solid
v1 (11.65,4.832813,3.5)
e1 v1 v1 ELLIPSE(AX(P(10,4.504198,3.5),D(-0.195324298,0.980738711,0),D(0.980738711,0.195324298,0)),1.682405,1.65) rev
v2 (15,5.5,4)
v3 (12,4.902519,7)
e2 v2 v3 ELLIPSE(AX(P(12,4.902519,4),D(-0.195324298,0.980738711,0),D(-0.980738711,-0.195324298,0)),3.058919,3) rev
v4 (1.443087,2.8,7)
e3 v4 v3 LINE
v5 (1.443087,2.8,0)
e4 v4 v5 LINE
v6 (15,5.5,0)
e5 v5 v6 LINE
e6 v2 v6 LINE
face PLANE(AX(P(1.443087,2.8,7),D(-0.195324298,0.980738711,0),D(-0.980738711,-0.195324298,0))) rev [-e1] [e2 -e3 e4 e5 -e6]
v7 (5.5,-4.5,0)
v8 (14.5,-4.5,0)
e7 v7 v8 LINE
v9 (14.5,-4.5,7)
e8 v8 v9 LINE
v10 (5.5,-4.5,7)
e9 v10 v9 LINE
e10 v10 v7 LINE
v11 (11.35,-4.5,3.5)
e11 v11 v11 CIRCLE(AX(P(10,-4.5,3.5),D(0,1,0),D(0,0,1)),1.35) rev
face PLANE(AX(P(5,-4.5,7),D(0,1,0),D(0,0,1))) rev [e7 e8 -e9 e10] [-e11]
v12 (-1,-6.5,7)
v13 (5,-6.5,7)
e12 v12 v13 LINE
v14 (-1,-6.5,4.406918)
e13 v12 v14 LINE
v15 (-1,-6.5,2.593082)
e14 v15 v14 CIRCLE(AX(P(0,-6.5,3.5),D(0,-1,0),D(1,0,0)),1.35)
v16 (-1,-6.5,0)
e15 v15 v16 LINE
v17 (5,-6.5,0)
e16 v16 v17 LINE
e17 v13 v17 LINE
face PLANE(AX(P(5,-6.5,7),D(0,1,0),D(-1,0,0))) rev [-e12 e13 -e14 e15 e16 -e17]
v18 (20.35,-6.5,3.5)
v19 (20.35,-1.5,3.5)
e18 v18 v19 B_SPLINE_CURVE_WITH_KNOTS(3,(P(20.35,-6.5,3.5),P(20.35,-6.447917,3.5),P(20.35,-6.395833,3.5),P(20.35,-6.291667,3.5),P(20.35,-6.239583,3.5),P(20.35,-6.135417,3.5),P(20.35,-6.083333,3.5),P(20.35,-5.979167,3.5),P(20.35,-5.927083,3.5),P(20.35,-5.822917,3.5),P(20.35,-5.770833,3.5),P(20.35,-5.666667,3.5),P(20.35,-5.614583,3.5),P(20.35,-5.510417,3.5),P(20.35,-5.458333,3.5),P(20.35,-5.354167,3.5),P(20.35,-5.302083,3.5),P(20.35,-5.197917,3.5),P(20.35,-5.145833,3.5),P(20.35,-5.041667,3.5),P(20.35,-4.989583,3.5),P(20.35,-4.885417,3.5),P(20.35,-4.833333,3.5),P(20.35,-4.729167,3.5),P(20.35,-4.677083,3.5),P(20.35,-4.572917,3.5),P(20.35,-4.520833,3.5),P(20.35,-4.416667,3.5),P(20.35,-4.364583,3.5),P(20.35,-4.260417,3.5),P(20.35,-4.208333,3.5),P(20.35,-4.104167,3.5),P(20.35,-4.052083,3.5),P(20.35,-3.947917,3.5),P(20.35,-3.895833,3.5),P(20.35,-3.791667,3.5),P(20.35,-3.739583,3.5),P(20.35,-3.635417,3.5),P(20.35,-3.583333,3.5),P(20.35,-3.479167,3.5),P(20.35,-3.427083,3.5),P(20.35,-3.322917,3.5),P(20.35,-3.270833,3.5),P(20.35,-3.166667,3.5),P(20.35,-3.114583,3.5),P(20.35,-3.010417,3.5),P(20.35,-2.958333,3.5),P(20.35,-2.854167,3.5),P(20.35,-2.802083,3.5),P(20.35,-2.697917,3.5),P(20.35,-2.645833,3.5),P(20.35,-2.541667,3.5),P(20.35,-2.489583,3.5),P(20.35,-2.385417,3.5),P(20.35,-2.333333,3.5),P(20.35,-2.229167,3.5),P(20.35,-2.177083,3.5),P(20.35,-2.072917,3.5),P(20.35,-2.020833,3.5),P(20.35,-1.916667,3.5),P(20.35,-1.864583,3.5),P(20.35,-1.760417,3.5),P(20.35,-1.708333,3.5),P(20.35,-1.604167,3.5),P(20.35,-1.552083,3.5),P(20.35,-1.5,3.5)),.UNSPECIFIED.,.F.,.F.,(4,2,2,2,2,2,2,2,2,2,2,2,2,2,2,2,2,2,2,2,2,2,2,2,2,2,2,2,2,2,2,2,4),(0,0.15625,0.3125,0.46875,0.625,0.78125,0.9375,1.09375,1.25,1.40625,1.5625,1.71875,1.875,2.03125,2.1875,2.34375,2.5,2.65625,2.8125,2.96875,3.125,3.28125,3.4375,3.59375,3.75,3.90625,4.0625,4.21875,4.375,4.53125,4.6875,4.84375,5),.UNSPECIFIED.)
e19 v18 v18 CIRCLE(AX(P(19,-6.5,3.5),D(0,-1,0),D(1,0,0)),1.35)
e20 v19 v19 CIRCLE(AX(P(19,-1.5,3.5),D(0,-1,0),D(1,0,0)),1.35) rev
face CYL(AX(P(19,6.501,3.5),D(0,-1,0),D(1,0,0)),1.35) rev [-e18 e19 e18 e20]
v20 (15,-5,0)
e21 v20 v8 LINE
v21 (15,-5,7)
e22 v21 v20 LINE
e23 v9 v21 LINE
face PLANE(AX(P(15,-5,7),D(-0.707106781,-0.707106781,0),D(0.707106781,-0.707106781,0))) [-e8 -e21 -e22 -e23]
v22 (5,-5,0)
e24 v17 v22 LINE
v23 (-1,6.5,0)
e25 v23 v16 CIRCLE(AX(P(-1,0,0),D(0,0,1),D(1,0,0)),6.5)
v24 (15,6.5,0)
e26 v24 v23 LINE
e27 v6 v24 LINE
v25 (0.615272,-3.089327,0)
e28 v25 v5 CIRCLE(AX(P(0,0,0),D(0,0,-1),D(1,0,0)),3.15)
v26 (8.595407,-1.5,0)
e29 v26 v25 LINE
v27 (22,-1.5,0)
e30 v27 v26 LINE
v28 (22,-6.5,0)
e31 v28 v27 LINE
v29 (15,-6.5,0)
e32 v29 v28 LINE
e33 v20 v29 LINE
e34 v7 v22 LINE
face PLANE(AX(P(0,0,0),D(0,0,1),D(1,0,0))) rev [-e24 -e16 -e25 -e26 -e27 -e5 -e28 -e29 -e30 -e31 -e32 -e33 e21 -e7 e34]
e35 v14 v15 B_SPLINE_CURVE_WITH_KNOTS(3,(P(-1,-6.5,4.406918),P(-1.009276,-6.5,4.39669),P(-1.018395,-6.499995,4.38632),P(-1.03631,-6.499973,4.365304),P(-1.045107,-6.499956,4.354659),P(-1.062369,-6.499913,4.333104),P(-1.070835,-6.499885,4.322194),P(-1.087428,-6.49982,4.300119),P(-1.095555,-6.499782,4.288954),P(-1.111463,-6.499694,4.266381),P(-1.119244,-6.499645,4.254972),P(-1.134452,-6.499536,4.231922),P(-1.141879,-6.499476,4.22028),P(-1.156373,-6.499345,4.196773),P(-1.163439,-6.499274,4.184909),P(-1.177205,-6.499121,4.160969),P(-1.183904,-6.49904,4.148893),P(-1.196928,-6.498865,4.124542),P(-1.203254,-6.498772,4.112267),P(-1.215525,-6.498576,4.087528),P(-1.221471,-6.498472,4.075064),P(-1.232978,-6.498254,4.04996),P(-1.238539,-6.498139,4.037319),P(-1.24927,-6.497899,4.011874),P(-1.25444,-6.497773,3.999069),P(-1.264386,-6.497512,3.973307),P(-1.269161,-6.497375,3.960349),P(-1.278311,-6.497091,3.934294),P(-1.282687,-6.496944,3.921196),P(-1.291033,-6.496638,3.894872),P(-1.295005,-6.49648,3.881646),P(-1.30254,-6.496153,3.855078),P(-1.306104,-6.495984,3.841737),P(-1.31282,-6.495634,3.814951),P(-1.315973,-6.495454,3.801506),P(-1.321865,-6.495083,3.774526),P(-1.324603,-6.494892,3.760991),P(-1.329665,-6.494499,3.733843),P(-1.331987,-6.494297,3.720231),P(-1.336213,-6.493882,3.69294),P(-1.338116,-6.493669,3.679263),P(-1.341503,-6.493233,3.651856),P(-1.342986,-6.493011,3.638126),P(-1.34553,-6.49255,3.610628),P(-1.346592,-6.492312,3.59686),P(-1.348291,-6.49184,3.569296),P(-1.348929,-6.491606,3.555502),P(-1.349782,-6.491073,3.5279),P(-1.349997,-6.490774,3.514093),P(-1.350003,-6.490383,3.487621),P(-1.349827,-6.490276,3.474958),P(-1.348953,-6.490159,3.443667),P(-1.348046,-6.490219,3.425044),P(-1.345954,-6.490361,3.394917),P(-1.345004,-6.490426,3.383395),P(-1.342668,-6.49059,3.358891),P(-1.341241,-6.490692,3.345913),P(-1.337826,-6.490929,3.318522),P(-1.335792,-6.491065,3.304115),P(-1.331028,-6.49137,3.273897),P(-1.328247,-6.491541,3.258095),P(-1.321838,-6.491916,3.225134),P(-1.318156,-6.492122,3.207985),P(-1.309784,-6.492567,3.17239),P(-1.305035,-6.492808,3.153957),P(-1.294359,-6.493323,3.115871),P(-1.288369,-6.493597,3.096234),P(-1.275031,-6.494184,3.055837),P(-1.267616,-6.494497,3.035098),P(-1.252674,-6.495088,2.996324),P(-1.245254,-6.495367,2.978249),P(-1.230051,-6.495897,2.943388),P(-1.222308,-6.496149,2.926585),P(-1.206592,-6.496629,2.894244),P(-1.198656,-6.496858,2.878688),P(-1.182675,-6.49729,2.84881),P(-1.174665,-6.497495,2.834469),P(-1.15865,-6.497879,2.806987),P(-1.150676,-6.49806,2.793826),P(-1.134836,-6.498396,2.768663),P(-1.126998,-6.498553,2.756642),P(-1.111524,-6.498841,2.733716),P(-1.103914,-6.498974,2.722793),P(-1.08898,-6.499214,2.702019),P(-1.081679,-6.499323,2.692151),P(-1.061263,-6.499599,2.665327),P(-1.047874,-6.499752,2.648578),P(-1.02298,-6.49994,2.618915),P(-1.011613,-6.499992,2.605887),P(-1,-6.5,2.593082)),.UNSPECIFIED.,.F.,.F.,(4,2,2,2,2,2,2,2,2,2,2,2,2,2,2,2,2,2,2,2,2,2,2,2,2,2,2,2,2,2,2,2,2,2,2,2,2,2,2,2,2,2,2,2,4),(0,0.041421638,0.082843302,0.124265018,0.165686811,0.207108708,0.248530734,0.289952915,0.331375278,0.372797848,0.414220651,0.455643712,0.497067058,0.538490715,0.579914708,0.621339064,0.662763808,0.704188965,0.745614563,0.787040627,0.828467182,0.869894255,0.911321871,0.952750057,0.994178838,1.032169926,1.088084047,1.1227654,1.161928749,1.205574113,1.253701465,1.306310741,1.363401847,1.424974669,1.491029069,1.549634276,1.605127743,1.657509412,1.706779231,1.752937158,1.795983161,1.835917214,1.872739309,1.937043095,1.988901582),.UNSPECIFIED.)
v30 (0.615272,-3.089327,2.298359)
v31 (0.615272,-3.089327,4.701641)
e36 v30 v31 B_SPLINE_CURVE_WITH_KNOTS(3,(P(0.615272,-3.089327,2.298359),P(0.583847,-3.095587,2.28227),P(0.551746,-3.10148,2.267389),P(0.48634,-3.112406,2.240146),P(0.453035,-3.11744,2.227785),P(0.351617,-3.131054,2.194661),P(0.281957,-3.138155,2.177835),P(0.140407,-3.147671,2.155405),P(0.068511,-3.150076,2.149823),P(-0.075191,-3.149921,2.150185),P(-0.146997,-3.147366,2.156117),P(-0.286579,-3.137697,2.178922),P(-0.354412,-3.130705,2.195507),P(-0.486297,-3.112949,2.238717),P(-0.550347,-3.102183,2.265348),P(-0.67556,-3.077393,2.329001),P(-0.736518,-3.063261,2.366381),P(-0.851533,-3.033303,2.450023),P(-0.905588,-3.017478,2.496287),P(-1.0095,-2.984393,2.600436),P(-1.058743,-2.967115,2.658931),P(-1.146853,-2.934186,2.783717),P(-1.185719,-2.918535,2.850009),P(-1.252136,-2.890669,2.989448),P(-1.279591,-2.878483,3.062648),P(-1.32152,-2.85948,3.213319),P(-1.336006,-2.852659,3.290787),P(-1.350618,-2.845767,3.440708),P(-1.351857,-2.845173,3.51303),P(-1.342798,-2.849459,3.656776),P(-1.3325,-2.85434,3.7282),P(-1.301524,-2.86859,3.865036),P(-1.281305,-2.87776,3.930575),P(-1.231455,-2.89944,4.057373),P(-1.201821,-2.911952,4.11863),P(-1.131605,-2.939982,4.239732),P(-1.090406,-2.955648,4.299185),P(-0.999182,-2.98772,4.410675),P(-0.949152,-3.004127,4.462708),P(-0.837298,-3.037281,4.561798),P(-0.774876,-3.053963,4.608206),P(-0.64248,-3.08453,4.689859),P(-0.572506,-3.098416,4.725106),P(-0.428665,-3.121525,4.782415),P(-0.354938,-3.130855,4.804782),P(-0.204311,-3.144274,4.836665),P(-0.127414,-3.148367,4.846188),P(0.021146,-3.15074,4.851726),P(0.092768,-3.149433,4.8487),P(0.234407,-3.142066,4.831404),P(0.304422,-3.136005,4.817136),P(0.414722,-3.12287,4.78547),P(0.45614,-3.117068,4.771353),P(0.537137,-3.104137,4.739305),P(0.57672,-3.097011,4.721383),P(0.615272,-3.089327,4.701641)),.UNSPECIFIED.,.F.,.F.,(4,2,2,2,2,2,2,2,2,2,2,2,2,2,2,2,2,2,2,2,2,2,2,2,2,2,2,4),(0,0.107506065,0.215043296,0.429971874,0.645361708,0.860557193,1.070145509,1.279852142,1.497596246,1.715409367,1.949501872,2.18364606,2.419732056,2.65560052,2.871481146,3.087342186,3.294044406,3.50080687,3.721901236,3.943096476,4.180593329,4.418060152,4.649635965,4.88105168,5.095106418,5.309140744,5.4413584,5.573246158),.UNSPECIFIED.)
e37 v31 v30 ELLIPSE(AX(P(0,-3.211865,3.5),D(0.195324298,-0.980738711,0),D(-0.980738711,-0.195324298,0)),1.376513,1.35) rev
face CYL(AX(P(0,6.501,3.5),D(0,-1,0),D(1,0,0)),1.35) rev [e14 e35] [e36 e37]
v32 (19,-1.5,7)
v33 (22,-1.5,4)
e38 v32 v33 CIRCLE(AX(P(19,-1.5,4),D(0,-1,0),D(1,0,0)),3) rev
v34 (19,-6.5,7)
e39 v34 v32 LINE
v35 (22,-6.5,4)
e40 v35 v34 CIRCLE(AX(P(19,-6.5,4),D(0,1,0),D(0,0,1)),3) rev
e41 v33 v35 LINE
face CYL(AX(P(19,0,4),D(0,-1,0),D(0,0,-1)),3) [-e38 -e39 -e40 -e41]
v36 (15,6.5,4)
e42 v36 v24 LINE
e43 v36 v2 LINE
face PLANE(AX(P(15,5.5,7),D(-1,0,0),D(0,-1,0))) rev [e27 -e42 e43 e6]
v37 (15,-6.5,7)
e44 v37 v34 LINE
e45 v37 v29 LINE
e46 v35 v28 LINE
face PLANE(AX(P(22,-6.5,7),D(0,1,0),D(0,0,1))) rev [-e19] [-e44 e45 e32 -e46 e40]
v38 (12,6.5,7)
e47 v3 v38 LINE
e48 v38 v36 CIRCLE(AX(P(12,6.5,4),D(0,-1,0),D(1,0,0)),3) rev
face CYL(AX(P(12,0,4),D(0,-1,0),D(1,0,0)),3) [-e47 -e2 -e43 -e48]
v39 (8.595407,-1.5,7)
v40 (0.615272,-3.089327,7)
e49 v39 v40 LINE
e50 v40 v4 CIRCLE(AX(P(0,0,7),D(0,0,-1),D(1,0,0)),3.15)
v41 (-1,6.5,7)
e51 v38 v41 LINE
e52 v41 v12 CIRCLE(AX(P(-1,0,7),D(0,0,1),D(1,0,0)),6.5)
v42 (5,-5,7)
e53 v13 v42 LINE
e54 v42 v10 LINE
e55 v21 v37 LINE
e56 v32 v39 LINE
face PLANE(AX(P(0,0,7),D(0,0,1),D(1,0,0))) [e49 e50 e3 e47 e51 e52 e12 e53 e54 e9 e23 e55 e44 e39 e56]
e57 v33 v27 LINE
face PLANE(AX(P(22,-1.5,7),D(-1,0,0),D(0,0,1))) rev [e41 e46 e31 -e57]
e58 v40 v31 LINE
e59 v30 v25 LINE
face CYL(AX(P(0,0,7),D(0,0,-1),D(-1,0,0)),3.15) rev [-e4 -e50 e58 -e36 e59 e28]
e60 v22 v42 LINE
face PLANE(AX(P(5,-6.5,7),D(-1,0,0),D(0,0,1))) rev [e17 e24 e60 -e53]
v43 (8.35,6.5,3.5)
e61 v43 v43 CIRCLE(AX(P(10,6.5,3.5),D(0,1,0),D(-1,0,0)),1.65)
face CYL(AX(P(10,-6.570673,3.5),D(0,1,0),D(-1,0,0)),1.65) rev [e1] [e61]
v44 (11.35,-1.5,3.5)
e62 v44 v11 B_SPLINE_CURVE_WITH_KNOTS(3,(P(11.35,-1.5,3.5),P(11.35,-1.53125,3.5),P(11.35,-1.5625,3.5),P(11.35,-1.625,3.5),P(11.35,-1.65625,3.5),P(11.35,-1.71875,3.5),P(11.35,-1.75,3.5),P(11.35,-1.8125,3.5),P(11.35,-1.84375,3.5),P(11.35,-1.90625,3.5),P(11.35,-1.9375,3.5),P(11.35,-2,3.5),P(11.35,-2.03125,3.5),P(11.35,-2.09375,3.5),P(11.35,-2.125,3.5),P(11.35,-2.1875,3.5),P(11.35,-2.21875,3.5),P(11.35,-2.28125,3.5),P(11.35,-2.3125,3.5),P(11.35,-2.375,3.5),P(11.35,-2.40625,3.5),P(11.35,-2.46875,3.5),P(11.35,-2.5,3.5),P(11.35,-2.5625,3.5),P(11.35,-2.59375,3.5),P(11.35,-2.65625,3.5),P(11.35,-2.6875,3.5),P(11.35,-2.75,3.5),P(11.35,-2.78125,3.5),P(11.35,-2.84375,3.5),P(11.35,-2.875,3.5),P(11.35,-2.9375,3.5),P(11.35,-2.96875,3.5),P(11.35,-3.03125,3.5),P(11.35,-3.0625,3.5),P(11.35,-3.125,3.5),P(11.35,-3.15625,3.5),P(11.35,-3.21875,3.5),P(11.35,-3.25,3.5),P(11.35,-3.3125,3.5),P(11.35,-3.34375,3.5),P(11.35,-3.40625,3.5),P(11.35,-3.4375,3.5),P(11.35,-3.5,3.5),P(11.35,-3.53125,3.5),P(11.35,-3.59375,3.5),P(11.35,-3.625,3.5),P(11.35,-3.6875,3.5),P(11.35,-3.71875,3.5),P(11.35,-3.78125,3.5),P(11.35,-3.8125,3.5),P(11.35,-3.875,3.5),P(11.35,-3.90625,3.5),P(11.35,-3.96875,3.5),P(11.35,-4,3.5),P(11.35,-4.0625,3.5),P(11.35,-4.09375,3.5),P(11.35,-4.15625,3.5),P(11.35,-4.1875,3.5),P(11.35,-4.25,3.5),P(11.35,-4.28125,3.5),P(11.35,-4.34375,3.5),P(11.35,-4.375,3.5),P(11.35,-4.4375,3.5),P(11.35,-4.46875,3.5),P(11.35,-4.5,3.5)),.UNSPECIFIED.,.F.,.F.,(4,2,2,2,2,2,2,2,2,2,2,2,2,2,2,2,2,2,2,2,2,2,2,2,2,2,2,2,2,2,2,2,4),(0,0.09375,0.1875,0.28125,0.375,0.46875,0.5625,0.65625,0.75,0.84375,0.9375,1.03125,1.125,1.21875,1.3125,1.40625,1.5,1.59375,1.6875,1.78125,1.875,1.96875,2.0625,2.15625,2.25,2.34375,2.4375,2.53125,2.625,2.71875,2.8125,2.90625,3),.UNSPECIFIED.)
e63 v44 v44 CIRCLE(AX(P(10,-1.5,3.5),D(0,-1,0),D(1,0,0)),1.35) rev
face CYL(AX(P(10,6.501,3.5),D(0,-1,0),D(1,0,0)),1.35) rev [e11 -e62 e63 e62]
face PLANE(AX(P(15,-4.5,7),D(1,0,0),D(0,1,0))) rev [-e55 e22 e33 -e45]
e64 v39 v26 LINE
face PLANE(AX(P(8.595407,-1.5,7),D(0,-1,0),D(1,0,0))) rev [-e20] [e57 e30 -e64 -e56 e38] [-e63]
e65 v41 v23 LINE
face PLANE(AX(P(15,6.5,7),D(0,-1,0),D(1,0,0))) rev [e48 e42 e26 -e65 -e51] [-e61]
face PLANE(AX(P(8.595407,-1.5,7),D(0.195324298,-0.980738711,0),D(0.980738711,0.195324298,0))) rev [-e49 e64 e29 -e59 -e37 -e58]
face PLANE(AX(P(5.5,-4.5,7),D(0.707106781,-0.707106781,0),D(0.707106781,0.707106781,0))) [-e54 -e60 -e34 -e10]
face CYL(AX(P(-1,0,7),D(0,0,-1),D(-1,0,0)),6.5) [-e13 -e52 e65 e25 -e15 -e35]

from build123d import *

# Parameters (mm, degrees)
BOSS_EXTRUDE1_DEPTH = 7
CUT_EXTRUDE1_REACH  = 28.495
SKETCH2_R           = 1.35
CUT_EXTRUDE2_REACH  = 28.495
SKETCH3_R           = 1.65
FILLET1_R           = 3
CHAMFER2_SIZE       = 0.5


with BuildPart() as part:
    # Sketch1 → Boss-Extrude1 (new body)
    with BuildSketch(Plane.XY):
        with BuildLine():
            Line((1.443086969, 2.8), (15, 5.5))
            Line((15, 5.5), (15, 6.5))
            Line((15, 6.5), (-1, 6.5))
            ThreePointArc((-1, 6.5), (-7.5, 0), (-1, -6.5))
            Line((-1, -6.5), (5, -6.5))
            Line((5, -6.5), (5, -4.5))
            Line((5, -4.5), (15, -4.5))
            Line((15, -4.5), (15, -6.5))
            Line((15, -6.5), (22, -6.5))
            Line((22, -6.5), (22, -1.5))
            Line((22, -1.5), (8.595407496, -1.5))
            Line((8.595407496, -1.5), (0.615271538, -3.089326939))
            ThreePointArc((0.615271538, -3.089326939), (-3.119335327, 0.438459937), (1.443086969, 2.8))
        make_face()
    extrude(amount=BOSS_EXTRUDE1_DEPTH)

    # Sketch2 → Cut-Extrude1 (cut, up to next)
    with BuildSketch(Plane.XZ.offset(6.5), mode=Mode.PRIVATE) as cut_extrude1_sk1:
        with Locations(Location((0, 3.5, 0), (0, 0, 62.886368109))):
            Circle(SKETCH2_R)
    cut_extrude1_tool1 = extrude(cut_extrude1_sk1.sketch, amount=-CUT_EXTRUDE1_REACH, mode=Mode.PRIVATE) & part.part
    # Sketch2 → Cut-Extrude1 (cut, up to next)
    with BuildSketch(Plane.XZ.offset(6.5), mode=Mode.PRIVATE) as cut_extrude1_sk2:
        with Locations((10, 3.5)):
            Circle(SKETCH2_R)
    cut_extrude1_tool2 = extrude(cut_extrude1_sk2.sketch, amount=-CUT_EXTRUDE1_REACH, mode=Mode.PRIVATE) & part.part
    # Sketch2 → Cut-Extrude1 (cut, up to next)
    with BuildSketch(Plane.XZ.offset(6.5), mode=Mode.PRIVATE) as cut_extrude1_sk3:
        with Locations((19, 3.5)):
            Circle(SKETCH2_R)
    cut_extrude1_tool3 = extrude(cut_extrude1_sk3.sketch, amount=-CUT_EXTRUDE1_REACH, mode=Mode.PRIVATE) & part.part
    add(cut_extrude1_tool1.solids().sort_by_distance((0, -6.5, 3.5))[0], mode=Mode.SUBTRACT)
    add(cut_extrude1_tool2.solids().sort_by_distance((10, -6.5, 3.5))[0], mode=Mode.SUBTRACT)
    add(cut_extrude1_tool3.solids().sort_by_distance((19, -6.5, 3.5))[0], mode=Mode.SUBTRACT)

    # Cut-Extrude2: up to this plane
    cut_extrude2_end = Plane(origin=(1.443086969, 2.8, 7), z_dir=(-0.19532429785675304, 0.9807387107006466, 0))
    # Sketch3 → Cut-Extrude2 (cut, up to the surface)
    with BuildSketch(Plane(origin=(0, 6.5, 0), x_dir=(1, 0, 0), z_dir=(0, 1, 0)), mode=Mode.PRIVATE) as cut_extrude2_sk1:
        with Locations(Location((10, -3.5, 0), (0, 0, 180))):
            Circle(SKETCH3_R)
    cut_extrude2_tool1 = split(extrude(cut_extrude2_sk1.sketch, amount=-CUT_EXTRUDE2_REACH, mode=Mode.PRIVATE), bisect_by=cut_extrude2_end, keep=Keep.BOTH, mode=Mode.PRIVATE)
    add(cut_extrude2_tool1.solids().sort_by_distance((10, 6.5, 3.5))[0], mode=Mode.SUBTRACT)

    # Fillet1
    fillet1_edges = [part.edges().sort_by_distance(p)[0] for p in [
        (15, 6, 7),
        (22, -4, 7),
    ]]
    fillet(fillet1_edges, radius=FILLET1_R)

    # Chamfer2
    chamfer2_edges = [part.edges().sort_by_distance(p)[0] for p in [
        (15, -4.5, 3.5),
        (5, -4.5, 3.5),
    ]]
    chamfer(chamfer2_edges, length=CHAMFER2_SIZE)


solid = part.part
